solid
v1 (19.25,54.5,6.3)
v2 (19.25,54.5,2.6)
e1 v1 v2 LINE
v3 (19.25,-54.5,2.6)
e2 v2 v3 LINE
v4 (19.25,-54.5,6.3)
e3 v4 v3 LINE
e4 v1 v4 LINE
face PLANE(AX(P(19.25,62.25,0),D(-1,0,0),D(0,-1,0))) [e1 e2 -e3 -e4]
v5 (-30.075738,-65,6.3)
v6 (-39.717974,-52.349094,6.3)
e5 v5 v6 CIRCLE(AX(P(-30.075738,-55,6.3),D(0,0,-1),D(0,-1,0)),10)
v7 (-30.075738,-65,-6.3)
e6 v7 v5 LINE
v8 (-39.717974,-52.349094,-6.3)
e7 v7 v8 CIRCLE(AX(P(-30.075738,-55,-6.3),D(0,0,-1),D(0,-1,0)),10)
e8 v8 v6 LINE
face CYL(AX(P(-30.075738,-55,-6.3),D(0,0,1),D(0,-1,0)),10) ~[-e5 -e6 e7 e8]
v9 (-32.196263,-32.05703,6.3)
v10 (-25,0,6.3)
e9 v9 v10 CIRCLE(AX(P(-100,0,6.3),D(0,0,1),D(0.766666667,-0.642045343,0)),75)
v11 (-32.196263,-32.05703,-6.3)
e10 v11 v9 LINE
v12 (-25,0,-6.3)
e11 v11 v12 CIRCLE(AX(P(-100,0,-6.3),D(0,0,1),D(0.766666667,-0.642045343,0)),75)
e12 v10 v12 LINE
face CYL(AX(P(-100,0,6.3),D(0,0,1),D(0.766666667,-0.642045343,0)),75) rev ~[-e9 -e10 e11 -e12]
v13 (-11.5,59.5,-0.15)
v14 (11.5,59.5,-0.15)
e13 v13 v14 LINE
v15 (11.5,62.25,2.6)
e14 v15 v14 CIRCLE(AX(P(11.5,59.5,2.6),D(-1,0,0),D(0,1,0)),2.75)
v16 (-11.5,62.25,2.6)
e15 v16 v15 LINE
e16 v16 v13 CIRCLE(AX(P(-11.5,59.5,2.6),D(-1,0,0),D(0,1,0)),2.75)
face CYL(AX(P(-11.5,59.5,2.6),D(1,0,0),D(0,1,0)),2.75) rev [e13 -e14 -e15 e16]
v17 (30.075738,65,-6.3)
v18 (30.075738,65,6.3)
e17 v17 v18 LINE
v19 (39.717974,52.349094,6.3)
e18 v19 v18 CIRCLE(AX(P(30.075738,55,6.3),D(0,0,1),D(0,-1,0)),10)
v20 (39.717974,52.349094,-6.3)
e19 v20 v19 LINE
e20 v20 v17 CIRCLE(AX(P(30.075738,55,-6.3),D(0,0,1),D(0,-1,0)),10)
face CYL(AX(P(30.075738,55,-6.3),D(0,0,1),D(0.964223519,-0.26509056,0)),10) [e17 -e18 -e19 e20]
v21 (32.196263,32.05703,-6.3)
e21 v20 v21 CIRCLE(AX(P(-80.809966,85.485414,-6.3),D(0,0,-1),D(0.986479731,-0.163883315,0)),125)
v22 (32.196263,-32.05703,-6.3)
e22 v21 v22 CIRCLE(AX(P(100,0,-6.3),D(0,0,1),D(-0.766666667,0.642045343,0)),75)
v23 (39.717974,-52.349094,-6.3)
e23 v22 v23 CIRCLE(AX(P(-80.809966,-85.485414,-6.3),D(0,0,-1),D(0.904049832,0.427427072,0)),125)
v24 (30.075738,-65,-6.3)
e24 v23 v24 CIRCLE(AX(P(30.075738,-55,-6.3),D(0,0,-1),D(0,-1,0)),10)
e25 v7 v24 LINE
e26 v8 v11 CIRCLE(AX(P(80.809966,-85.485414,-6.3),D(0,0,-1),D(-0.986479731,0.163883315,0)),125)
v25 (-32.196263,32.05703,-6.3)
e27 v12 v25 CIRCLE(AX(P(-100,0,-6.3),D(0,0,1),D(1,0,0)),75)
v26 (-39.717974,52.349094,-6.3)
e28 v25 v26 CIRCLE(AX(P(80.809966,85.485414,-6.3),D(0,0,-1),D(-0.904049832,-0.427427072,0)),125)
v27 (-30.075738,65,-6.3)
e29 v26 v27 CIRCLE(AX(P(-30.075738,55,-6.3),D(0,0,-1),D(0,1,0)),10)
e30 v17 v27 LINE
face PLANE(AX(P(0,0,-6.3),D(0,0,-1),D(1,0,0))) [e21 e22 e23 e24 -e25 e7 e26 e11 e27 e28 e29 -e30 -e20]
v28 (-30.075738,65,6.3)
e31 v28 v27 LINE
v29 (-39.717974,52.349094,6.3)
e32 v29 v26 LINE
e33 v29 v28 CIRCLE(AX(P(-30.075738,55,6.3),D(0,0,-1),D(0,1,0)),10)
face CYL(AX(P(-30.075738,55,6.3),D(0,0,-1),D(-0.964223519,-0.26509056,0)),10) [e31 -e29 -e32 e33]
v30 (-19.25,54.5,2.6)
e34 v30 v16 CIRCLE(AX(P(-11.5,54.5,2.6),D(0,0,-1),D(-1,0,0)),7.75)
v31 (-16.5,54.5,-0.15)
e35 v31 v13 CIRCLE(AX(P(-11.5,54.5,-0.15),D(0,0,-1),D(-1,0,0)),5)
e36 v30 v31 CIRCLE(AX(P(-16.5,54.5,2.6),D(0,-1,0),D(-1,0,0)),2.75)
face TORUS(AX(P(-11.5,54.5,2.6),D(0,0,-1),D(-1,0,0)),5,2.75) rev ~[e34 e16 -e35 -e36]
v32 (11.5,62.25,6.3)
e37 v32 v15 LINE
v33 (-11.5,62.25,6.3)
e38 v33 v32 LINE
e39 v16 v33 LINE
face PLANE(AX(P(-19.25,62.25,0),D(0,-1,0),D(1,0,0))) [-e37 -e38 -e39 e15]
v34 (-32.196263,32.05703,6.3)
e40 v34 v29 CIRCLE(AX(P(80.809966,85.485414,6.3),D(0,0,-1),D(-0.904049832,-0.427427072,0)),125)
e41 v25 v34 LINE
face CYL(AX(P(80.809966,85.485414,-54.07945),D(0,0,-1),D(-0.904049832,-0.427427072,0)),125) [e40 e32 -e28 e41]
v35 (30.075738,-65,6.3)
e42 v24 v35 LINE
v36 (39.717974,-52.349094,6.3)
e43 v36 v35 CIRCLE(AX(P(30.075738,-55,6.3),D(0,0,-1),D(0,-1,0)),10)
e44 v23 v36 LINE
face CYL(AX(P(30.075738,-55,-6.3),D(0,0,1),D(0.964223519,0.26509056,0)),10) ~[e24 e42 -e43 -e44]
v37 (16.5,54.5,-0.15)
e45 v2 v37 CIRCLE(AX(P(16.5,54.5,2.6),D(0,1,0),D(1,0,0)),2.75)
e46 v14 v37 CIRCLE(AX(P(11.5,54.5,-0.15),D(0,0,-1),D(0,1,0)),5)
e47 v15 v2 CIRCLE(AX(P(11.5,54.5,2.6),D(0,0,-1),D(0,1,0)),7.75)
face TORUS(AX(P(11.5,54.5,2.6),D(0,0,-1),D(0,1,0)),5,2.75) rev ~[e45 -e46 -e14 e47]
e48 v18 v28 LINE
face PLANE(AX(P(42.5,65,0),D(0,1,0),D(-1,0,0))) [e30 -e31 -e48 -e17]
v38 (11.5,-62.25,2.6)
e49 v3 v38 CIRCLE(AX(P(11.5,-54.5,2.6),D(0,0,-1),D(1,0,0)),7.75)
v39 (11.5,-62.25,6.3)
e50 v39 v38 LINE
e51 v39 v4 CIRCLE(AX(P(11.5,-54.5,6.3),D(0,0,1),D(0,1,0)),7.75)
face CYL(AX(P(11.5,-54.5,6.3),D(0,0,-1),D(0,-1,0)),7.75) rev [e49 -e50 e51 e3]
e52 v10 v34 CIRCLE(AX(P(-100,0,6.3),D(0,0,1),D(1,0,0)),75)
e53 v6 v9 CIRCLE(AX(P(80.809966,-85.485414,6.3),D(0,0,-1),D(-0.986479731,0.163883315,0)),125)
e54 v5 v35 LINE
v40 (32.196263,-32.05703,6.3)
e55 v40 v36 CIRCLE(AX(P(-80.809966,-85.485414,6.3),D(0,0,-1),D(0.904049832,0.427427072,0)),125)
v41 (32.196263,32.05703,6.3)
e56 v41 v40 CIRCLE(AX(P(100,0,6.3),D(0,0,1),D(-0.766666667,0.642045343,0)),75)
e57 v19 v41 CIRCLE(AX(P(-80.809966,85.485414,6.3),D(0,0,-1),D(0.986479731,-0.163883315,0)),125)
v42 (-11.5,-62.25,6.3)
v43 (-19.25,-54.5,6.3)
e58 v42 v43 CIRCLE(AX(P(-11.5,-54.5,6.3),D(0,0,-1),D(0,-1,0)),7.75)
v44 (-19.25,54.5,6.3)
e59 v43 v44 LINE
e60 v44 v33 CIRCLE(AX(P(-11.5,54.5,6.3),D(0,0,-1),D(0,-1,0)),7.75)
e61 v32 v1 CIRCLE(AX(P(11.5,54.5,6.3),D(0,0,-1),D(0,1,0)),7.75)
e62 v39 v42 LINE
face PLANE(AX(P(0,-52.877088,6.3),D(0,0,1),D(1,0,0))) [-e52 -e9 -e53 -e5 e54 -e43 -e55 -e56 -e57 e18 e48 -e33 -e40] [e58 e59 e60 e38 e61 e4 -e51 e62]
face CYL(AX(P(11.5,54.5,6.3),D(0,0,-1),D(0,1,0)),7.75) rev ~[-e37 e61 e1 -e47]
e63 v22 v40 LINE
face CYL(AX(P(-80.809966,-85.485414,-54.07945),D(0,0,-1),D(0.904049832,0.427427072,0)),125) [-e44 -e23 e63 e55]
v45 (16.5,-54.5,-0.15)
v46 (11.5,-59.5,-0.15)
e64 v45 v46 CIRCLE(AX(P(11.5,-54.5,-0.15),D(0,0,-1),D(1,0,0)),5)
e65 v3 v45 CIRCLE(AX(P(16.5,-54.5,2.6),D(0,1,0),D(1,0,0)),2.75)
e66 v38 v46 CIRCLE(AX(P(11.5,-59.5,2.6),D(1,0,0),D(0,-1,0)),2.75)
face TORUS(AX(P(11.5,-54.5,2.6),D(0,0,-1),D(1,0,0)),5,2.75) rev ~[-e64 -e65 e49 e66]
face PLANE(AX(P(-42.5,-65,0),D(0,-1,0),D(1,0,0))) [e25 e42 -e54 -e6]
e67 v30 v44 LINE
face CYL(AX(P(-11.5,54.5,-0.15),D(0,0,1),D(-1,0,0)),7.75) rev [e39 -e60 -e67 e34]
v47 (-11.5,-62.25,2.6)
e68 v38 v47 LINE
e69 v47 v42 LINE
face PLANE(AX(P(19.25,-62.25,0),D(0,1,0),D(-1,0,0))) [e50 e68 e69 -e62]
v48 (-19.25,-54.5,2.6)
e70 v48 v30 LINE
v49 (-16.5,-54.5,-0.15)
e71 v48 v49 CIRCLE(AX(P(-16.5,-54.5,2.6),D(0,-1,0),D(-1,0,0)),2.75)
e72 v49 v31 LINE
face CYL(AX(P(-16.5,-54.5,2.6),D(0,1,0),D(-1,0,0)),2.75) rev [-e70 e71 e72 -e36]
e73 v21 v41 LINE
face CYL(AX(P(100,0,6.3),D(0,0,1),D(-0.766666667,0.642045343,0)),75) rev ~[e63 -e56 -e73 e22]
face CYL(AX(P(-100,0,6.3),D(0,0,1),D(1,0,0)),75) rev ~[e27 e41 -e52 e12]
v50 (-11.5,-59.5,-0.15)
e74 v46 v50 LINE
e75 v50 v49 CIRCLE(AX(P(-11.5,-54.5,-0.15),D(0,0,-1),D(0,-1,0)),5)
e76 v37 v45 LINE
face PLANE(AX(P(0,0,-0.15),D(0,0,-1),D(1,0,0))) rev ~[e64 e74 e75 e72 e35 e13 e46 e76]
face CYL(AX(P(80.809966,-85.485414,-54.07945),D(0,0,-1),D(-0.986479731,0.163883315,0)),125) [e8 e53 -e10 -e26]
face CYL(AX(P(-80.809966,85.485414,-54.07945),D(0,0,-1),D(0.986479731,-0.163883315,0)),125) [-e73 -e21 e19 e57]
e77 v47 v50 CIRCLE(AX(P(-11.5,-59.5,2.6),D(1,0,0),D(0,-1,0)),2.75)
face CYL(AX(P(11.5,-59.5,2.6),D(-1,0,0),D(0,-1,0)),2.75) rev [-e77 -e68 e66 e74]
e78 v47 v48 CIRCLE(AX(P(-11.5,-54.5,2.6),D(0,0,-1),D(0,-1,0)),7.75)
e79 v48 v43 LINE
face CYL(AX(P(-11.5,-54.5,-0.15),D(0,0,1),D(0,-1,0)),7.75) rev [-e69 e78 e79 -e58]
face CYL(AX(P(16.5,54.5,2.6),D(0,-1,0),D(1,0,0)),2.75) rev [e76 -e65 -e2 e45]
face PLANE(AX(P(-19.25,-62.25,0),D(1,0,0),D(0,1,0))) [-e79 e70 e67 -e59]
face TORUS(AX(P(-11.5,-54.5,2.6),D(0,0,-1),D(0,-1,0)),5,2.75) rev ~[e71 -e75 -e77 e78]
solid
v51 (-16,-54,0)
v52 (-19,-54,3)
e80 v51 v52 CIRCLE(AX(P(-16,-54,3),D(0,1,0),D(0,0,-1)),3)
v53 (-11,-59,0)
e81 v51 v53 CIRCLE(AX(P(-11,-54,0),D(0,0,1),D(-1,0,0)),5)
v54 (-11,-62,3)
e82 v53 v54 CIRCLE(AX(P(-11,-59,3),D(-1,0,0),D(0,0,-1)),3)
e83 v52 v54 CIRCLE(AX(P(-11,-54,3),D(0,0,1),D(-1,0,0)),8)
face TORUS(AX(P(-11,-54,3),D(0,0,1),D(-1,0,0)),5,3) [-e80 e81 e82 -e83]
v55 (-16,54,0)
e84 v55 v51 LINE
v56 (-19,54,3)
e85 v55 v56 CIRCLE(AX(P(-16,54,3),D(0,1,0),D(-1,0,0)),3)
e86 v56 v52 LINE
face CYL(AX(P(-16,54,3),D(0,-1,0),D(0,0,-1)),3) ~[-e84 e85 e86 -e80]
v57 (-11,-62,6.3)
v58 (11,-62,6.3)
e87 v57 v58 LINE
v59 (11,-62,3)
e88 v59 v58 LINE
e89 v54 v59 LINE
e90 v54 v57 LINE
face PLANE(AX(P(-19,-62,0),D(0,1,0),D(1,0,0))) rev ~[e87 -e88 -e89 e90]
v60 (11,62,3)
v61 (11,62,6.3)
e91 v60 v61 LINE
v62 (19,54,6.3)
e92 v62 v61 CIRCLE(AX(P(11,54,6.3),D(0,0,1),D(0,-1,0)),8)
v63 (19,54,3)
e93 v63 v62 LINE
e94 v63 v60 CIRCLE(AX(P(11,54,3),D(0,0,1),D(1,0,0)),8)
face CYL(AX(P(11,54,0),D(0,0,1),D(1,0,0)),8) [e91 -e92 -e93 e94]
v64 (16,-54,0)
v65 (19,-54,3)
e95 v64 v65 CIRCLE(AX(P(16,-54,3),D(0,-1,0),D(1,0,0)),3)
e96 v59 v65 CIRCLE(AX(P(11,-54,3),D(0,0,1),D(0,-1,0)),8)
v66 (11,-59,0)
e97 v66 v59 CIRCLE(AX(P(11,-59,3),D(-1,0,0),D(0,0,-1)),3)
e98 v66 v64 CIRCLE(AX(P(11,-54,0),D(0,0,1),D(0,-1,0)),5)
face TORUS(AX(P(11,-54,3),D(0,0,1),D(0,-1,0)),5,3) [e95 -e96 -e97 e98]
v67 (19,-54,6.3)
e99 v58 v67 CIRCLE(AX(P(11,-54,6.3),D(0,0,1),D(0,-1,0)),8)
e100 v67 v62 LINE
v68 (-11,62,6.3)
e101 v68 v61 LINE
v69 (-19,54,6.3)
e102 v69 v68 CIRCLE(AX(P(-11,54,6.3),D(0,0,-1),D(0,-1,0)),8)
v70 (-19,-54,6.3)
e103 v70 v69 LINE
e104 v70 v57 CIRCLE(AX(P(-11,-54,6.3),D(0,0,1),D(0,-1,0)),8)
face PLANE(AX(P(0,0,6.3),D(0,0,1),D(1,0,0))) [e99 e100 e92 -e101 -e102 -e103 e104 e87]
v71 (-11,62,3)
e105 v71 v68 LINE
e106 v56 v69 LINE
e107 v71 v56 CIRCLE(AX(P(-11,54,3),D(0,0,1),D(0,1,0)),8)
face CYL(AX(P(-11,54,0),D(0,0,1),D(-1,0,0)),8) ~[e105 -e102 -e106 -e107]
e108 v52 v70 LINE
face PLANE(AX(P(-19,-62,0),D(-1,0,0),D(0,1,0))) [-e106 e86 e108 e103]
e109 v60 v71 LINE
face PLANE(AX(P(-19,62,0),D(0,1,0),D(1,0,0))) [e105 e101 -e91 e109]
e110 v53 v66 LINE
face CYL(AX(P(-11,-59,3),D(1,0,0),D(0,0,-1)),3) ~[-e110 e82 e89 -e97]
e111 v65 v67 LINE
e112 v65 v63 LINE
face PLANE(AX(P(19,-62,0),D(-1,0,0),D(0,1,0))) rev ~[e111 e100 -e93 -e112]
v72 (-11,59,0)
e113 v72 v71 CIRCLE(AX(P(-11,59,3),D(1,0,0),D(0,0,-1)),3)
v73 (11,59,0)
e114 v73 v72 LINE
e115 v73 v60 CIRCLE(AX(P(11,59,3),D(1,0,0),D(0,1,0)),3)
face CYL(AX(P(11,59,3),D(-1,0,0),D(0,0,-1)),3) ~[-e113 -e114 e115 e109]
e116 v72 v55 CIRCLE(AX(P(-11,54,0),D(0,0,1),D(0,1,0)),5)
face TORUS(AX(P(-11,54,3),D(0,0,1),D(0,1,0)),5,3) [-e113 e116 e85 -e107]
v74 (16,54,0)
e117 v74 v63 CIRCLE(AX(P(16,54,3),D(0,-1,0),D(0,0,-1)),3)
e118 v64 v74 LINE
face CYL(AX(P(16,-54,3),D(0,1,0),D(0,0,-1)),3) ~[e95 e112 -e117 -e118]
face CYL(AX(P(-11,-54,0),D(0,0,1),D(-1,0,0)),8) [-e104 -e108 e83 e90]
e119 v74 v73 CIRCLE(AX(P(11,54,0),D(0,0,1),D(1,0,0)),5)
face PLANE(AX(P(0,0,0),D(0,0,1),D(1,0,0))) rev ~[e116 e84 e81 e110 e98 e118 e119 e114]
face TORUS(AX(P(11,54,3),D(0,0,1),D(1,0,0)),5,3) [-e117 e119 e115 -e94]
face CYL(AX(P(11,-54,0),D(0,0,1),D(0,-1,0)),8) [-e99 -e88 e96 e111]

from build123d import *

# Parameters (mm, degrees)
F0_W         = 38
F0_H         = 124
F1_DEPTH     = 6.3
F2_R         = 8
F3_R         = 3
F5_DEPTH     = 6.3
F6_W         = 38.5
F6_H         = 124.5
F7_DEPTH     = 6.15
F8_R         = 7.75
F9_R         = 2.75
F11_DEPTH    = 12.601
F12_T1_DEPTH = 108.1589008266
F13_R        = 10


# Not quite as in the source:
# - a fillet or chamfer that OpenCascade refuses, or shapes differently, is made with other operations: its cross-section is extruded or revolved along the edge and cut away or added


with BuildPart() as f1:
    # F0 (on Top) → F1 (new body)
    with BuildSketch(Plane.XY):
        Rectangle(F0_W, F0_H)
    extrude(amount=F1_DEPTH)

    # F2
    f2_edges = [f1.edges().sort_by_distance(p)[0] for p in [
        (19, 62, 3.15),
        (-19, 62, 3.15),
        (19, -62, 3.15),
        (-19, -62, 3.15),
    ]]
    fillet(f2_edges, radius=F2_R)

    # F3
    f3_edges = [f1.edges().sort_by_distance(p)[0] for p in [
        (0, -62, 0),
        (-16.656854, -59.656854, 0),
        (16.656854, -59.656854, 0),
        (-19, 0, 0),
        (19, 0, 0),
        (-16.656854, 59.656854, 0),
        (16.656854, 59.656854, 0),
        (0, 62, 0),
    ]]
    fillet(f3_edges, radius=F3_R)


with BuildPart() as f5:
    # F4 (on Top) → F5 (new body, symmetric)
    with BuildSketch(Plane.XY):
        with BuildLine():
            Line((19.25, -27.1095328612), (19.25, -62.25))
            Line((19.25, -62.25), (-19.25, -62.25))
            Line((-19.25, -62.25), (-19.25, -27.1095328612))
            ThreePointArc((-19.25, -27.1095328612), (-36.224128699, -42.7724832696), (-42.5, -65))
            Line((-42.5, -65), (42.5, -65))
            ThreePointArc((42.5, -65), (36.224128699, -42.7724832696), (19.25, -27.1095328612))
        make_face()
        with BuildLine():
            ThreePointArc((-42.5, -65), (-36.224128699, -42.7724832696), (-19.25, -27.1095328612))
            Line((-19.25, -27.1095328612), (-19.25, 27.1095328612))
            ThreePointArc((-19.25, 27.1095328612), (-36.224128699, 42.7724832696), (-42.5, 65))
            Line((-42.5, 65), (-42.5, -65))
        make_face()
        with BuildLine():
            Line((19.25, 27.1095328612), (19.25, -27.1095328612))
            ThreePointArc((19.25, -27.1095328612), (36.224128699, -42.7724832696), (42.5, -65))
            Line((42.5, -65), (42.5, 65))
            ThreePointArc((42.5, 65), (36.224128699, 42.7724832696), (19.25, 27.1095328612))
        make_face()
        with BuildLine():
            Line((19.25, 62.25), (19.25, 27.1095328612))
            ThreePointArc((19.25, 27.1095328612), (36.224128699, 42.7724832696), (42.5, 65))
            Line((42.5, 65), (-42.5, 65))
            ThreePointArc((-42.5, 65), (-36.224128699, 42.7724832696), (-19.25, 27.1095328612))
            Line((-19.25, 27.1095328612), (-19.25, 62.25))
            Line((-19.25, 62.25), (19.25, 62.25))
        make_face()
    extrude(amount=F5_DEPTH, both=True)

    # F6 (on face) → F7 (join)
    with BuildSketch(Plane(origin=(0, 0, -6.3), x_dir=(1, 0, 0), z_dir=(0, 0, -1))):
        Rectangle(F6_W, F6_H)
    extrude(amount=-F7_DEPTH)

    # F8
    f8_edges = [f5.edges().sort_by_distance(p)[0] for p in [
        (19.25, -62.25, 3.075),
        (-19.25, -62.25, 3.075),
        (19.25, 62.25, 3.075),
        (-19.25, 62.25, 3.075),
    ]]
    fillet(f8_edges, radius=F8_R)

    # F9
    f9_edges = [f5.edges().sort_by_distance(p)[0] for p in [
        (0, 62.25, -0.15),
        (-16.980078, 59.980078, -0.15),
        (16.980078, 59.980078, -0.15),
        (-19.25, 0, -0.15),
        (19.25, 0, -0.15),
        (-16.980078, -59.980078, -0.15),
        (16.980078, -59.980078, -0.15),
        (0, -62.25, -0.15),
    ]]
    fillet(f9_edges, radius=F9_R)

    # F10 (on face) → F11 (cut, through all)
    with BuildSketch(Plane.XY.offset(6.3)):
        with BuildLine():
            ThreePointArc((-25, 0), (-29.5106391006, 25.6173769149), (-42.5, 48.1534007106))
            Line((-42.5, 48.1534007106), (-42.5, -48.1534007106))
            ThreePointArc((-42.5, -48.1534007106), (-29.5106391006, -25.6173769149), (-25, 0))
        make_face()
        with BuildLine():
            Line((42.5, -48.1534007106), (42.5, 48.1534007106))
            ThreePointArc((42.5, 48.1534007106), (25, 0), (42.5, -48.1534007106))
        make_face()
    extrude(amount=-F11_DEPTH, mode=Mode.SUBTRACT)

    # F12: fillet of radius 125 on 4 edges, made by hand

    # F12_s2 → F12_t1 (cut)
    with BuildSketch(Plane.XY.offset(-54.0794504133)):
        with BuildLine():
            ThreePointArc((32.1962626253, -32.0570303993), (38.4906868537, -48.1711523883), (42.5, -65))
            Line((42.5, -65), (42.5, -48.1534007106))
            ThreePointArc((42.5, -48.1534007106), (36.8333162631, -40.4347630843), (32.1962626253, -32.0570303993))
        make_face()
        with BuildLine():
            ThreePointArc((42.5, 65), (38.4906868537, 48.1711523883), (32.1962626253, 32.0570303993))
            ThreePointArc((32.1962626253, 32.0570303993), (36.8333162631, 40.4347630843), (42.5, 48.1534007106))
            Line((42.5, 48.1534007106), (42.5, 65))
        make_face()
        with BuildLine():
            ThreePointArc((-42.5, -65), (-38.4906868537, -48.1711523883), (-32.1962626253, -32.0570303993))
            ThreePointArc((-32.1962626253, -32.0570303993), (-36.8333162631, -40.4347630843), (-42.5, -48.1534007106))
            Line((-42.5, -48.1534007106), (-42.5, -65))
        make_face()
        with BuildLine():
            ThreePointArc((-32.1962626253, 32.0570303993), (-38.4906868537, 48.1711523883), (-42.5, 65))
            Line((-42.5, 65), (-42.5, 48.1534007106))
            ThreePointArc((-42.5, 48.1534007106), (-36.8333162631, 40.4347630843), (-32.1962626253, 32.0570303993))
        make_face()
    extrude(amount=F12_T1_DEPTH, mode=Mode.SUBTRACT)

    # F13
    f13_edges = [f5.edges().sort_by_distance(p)[0] for p in [
        (-42.5, 65, 0),
        (42.5, 65, 0),
        (-42.5, -65, 0),
        (42.5, -65, 0),
    ]]
    fillet(f13_edges, radius=F13_R)


solid = Compound([f1.part, f5.part])
